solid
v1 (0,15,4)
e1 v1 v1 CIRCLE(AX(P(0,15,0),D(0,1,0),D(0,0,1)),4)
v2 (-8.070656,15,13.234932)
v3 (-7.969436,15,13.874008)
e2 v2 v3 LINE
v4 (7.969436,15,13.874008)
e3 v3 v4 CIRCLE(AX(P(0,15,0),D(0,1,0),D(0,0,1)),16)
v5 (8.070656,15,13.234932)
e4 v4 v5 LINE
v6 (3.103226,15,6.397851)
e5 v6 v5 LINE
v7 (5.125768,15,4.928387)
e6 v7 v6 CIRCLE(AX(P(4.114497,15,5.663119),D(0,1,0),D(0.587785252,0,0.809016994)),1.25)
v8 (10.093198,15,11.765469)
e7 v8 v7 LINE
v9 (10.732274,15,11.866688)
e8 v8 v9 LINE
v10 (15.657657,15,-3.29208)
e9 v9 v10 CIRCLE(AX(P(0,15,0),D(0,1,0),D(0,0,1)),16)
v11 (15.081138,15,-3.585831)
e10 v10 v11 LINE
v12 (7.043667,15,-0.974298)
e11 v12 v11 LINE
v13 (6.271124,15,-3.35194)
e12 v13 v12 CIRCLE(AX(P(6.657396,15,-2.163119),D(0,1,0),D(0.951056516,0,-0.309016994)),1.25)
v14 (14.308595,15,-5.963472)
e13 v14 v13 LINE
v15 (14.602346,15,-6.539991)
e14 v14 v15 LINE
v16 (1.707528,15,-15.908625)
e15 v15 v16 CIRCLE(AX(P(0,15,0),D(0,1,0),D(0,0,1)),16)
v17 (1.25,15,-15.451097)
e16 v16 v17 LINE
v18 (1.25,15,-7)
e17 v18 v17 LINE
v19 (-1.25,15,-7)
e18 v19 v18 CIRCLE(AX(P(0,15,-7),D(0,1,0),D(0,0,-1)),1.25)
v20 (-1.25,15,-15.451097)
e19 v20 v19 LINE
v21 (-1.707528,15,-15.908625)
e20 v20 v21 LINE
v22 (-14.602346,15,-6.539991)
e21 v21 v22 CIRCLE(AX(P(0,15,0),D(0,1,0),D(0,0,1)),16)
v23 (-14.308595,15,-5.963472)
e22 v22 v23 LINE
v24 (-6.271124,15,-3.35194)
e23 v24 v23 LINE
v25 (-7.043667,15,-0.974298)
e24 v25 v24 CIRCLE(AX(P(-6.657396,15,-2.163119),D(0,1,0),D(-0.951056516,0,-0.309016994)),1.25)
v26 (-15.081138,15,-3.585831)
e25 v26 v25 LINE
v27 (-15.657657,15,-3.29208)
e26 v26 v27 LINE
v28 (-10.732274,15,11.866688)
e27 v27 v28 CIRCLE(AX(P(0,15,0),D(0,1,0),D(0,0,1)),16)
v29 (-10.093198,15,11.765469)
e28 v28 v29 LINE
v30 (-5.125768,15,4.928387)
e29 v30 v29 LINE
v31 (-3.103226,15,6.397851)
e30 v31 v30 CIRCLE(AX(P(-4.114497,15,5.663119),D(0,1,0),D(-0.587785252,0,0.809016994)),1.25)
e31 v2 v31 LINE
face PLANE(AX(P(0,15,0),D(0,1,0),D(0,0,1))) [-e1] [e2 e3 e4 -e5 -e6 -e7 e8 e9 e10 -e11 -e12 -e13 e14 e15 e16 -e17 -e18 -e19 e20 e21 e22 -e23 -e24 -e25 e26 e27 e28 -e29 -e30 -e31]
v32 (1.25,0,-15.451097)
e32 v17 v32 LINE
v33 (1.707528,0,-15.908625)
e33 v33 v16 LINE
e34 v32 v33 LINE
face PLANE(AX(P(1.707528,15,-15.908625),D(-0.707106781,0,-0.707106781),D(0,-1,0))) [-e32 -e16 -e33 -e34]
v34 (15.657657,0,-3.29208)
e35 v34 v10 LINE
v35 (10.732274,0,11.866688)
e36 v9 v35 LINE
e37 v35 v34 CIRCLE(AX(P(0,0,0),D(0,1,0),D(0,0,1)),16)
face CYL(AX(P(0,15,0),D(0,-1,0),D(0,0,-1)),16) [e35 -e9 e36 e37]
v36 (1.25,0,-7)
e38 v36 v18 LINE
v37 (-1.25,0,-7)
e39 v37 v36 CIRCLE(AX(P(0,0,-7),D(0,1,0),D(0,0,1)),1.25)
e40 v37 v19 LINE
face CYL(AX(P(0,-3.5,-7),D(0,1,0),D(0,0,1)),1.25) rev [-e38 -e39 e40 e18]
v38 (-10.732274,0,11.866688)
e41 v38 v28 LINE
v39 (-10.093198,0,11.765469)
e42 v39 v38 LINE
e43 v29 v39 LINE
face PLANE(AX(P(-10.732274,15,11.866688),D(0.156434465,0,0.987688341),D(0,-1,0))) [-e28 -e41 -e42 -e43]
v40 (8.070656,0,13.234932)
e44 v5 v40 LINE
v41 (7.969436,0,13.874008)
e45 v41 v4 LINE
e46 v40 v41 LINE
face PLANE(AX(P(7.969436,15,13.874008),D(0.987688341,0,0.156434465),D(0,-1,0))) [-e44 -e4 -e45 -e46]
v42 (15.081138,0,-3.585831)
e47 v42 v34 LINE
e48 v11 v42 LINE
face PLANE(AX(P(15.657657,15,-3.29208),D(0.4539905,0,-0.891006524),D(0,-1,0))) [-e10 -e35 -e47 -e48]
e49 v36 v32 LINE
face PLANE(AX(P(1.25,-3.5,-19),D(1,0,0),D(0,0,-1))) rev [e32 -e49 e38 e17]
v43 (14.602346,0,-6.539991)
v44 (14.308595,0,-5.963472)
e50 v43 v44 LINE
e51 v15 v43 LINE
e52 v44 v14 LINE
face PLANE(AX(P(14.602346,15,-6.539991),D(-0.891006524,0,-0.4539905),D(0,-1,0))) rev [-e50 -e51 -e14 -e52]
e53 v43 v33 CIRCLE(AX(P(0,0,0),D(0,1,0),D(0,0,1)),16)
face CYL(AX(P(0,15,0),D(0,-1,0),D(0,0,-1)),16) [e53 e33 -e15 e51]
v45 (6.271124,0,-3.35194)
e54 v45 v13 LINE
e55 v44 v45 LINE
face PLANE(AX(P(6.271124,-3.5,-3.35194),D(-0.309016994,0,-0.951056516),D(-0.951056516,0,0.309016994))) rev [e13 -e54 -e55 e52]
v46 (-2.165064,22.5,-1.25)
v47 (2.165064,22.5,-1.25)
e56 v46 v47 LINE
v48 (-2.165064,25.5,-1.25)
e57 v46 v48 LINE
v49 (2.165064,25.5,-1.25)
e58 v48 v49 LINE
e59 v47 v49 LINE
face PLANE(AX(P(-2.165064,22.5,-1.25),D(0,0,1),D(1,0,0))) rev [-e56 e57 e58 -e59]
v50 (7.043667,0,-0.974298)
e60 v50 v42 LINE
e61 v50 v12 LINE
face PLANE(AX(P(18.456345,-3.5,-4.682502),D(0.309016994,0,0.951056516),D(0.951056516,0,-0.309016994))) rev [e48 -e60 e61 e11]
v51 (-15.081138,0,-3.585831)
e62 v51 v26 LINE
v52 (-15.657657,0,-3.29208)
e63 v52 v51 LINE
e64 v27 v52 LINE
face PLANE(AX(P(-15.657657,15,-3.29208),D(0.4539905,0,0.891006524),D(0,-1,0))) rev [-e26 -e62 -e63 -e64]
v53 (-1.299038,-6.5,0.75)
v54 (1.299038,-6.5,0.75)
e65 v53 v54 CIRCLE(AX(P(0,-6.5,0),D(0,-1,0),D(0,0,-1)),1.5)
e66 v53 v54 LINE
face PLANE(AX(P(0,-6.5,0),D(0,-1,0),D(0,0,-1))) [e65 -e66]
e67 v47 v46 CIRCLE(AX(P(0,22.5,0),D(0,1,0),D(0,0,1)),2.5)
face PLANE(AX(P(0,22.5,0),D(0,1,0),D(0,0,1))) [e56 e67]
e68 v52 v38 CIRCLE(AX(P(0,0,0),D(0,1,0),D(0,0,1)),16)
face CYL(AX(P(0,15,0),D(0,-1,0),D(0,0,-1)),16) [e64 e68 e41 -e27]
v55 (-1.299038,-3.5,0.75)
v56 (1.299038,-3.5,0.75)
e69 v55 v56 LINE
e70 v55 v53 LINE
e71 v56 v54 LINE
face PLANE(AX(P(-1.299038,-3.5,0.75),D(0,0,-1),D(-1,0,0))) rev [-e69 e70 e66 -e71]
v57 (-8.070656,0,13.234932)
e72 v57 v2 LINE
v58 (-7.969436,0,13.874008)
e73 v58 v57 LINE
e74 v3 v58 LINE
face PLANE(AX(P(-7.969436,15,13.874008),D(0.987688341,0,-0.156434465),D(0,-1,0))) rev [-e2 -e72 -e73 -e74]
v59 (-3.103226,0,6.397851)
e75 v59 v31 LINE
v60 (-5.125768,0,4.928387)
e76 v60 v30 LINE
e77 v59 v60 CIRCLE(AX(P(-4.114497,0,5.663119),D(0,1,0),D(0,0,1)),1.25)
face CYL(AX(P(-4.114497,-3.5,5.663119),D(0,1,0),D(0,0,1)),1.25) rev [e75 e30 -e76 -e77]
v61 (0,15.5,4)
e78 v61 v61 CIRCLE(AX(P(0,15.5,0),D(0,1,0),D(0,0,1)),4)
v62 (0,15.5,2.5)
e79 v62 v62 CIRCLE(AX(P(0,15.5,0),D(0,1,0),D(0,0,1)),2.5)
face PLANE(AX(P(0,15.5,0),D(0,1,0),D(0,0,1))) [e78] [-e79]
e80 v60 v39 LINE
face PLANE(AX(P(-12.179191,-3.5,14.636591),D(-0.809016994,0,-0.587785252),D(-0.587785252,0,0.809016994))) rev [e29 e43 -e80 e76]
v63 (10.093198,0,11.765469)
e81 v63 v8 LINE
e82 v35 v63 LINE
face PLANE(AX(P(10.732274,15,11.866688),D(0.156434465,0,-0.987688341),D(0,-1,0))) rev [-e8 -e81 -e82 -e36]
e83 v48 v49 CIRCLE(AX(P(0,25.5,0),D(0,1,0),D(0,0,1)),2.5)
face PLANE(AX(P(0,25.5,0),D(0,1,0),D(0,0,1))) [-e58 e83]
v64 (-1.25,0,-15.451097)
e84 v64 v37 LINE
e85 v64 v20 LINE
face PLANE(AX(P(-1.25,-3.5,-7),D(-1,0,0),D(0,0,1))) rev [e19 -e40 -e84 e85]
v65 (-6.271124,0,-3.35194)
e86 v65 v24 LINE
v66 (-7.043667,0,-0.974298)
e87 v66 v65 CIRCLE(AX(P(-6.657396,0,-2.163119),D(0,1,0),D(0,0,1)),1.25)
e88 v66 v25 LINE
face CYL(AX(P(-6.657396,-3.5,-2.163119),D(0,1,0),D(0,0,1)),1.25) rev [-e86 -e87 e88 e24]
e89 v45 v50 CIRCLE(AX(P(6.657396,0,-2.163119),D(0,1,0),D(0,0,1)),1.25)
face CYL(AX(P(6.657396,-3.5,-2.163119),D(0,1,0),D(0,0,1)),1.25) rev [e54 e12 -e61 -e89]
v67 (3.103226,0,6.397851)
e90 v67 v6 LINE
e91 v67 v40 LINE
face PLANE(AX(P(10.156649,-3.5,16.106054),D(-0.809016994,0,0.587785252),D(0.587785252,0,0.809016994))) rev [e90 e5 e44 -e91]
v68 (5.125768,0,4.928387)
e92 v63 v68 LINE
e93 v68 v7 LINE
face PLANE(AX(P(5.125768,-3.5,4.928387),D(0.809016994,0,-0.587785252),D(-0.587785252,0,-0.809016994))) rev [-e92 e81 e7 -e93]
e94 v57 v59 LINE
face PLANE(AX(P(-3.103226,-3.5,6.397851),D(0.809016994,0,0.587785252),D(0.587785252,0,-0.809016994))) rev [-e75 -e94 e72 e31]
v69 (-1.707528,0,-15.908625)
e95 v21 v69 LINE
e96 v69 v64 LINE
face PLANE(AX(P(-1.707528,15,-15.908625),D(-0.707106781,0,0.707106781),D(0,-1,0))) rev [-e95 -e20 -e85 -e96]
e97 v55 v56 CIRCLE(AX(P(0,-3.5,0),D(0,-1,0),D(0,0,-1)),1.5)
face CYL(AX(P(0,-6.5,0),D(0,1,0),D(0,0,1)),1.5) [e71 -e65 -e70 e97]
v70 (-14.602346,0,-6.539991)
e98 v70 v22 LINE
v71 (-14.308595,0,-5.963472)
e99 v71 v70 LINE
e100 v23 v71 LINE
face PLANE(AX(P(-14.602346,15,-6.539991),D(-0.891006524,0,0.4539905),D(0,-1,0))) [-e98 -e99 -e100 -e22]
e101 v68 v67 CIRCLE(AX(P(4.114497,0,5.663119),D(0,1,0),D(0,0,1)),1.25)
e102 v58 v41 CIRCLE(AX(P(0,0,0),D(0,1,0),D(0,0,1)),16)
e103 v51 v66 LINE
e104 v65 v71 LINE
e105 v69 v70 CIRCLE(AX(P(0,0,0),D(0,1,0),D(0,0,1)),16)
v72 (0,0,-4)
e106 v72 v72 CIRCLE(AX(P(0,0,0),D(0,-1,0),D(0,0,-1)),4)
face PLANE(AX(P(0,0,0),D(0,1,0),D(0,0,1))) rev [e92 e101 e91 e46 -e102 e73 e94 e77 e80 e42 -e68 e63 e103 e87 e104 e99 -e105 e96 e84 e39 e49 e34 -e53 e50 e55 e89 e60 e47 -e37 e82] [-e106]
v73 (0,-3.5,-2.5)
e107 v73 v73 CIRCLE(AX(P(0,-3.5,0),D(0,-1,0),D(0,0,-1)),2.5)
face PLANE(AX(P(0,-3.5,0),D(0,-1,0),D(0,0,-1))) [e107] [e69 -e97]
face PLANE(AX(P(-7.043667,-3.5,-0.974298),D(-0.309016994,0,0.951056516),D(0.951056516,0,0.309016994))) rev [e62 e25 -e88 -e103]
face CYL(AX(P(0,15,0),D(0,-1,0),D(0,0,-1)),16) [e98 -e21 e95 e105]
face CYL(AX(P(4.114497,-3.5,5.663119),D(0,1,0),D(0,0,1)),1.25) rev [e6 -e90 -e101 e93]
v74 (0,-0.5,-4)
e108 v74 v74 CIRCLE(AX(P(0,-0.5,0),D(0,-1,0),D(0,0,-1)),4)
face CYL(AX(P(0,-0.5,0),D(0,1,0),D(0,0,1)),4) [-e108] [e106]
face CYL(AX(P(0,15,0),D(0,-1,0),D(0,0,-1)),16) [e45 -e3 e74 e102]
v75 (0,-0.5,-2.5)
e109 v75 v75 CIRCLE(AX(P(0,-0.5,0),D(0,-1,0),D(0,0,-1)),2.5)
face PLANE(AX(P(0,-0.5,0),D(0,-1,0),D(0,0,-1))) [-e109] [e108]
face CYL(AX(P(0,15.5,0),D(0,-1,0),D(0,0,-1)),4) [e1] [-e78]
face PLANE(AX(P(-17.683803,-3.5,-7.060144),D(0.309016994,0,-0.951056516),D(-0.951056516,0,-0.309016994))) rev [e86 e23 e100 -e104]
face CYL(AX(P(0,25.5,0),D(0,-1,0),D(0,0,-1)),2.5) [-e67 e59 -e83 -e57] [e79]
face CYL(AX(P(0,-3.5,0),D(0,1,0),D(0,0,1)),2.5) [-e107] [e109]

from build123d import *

# Parameters (mm, degrees)
SKETCH_1_R               = 16
EXTRUDE_1_DEPTH          = 15
SKETCH_2_R               = 4
EXTRUDE_2_DEPTH          = 0.5
EXTRUDE_START            = 0.5
SKETCH_3_R               = 4
EXTRUDE_3_DEPTH          = 0.5
SKETCH_4_R               = 2.5
EXTRUDE_4_DEPTH          = 10
EXTRUDE_START_2          = 3
SKETCH_5_R               = 2.5
EXTRUDE_5_DEPTH          = 3
CUT_EXTRUDE_START        = -3
CUT_EXTRUDE_1_DEPTH      = 3
CUT_EXTRUDE_2_DEPTH      = 30.227555491
PATTERN_CIRCULAR_1_COUNT = 5
SKETCH_8_R               = 1.5
EXTRUDE_6_DEPTH          = 3
CHAMFER_1_SIZE           = 0.5
CUT_EXTRUDE_3_DEPTH      = 3


with BuildPart() as part:
    # 草图1 → 凸台-拉伸1 (new body)
    with BuildSketch(Plane(origin=(0, 0, 0), x_dir=(1, 0, 0), z_dir=(0, 1, 0))):
        with Locations(Location((0, 0, 0), (0, 0, 270))):
            Circle(SKETCH_1_R)
    extrude(amount=EXTRUDE_1_DEPTH)

    # 草图2 → 凸台-拉伸2 (add)
    with BuildSketch(Plane(origin=(0, 15, 0), x_dir=(1, 0, 0), z_dir=(0, 1, 0))):
        with Locations(Location((0, 0, 0), (0, 0, 270))):
            Circle(SKETCH_2_R)
    extrude(amount=EXTRUDE_2_DEPTH)

    # 草图3 → 凸台-拉伸3 (add)
    with BuildSketch(Plane.XZ.offset(EXTRUDE_START)):
        with Locations(Location((0, 0, 0), (0, 0, 90))):
            Circle(SKETCH_3_R)
    extrude(amount=-EXTRUDE_3_DEPTH)

    # 草图4 → 凸台-拉伸4 (add)
    with BuildSketch(Plane(origin=(0, 15.5, 0), x_dir=(1, 0, 0), z_dir=(0, 1, 0))):
        with Locations(Location((0, 0, 0), (0, 0, 270))):
            Circle(SKETCH_4_R)
    extrude(amount=EXTRUDE_4_DEPTH)

    # 草图5 → 凸台-拉伸5 (add)
    with BuildSketch(Plane.XZ.offset(0.5).offset(EXTRUDE_START_2)):
        with Locations(Location((0, 0, 0), (0, 0, 90))):
            Circle(SKETCH_5_R)
    extrude(amount=-EXTRUDE_5_DEPTH)

    # 草图6 → 切除-拉伸1 (cut)
    with BuildSketch(Plane(origin=(0, 25.5, 0), x_dir=(1, 0, 0), z_dir=(0, 1, 0)).offset(CUT_EXTRUDE_START)):
        with BuildLine():
            Line((-2.165063509, 1.25), (2.165063509, 1.25))
            ThreePointArc((2.165063509, 1.25), (0, 2.5), (-2.165063509, 1.25))
        make_face()
    extrude(amount=CUT_EXTRUDE_1_DEPTH, mode=Mode.SUBTRACT)

    # 草图7 → 切除-拉伸2 (cut, through all)
    with BuildSketch(Plane(origin=(0, 15, 0), x_dir=(1, 0, 0), z_dir=(0, 1, 0))):
        with BuildLine():
            Line((-1.25, 7), (-1.25, 19))
            Line((-1.25, 19), (1.25, 19))
            Line((1.25, 19), (1.25, 7))
            ThreePointArc((1.25, 7), (0, 5.75), (-1.25, 7))
        make_face()
    cut_extrude_2 = extrude(amount=-CUT_EXTRUDE_2_DEPTH, mode=Mode.SUBTRACT)

    # 阵列(圆周)1: 切除-拉伸2 ×5 about axis
    pattern_circular_1_axis = Axis((0, 0, 0), (0, 1, 0))
    for i in range(1, PATTERN_CIRCULAR_1_COUNT):
        add(cut_extrude_2.rotate(pattern_circular_1_axis, i * 360 / PATTERN_CIRCULAR_1_COUNT), mode=Mode.SUBTRACT)

    # 草图8 → 凸台-拉伸6 (add)
    with BuildSketch(Plane.XZ.offset(3.5)):
        with Locations(Location((0, 0, 0), (0, 0, 270))):
            Circle(SKETCH_8_R)
    extrude(amount=EXTRUDE_6_DEPTH)

    # 倒角1
    # the kernel refuses this chamfer: 0.5, 0.465086612 mm, written as the material it takes off along each edge
    with BuildSketch(Plane(origin=(-1.25, 16.285841494, -15.951097141), x_dir=(-0.9957189737161891, 0, 0.0924322745667282), z_dir=(0, -1, 0)), Plane(origin=(14.784123635, 16.285841494, -6.117980741), x_dir=(-0.3956024015425532, 0, -0.9184218746816544), z_dir=(0, -1, 0)), Plane(origin=(10.3870909, 16.285841494, 12.169977101), x_dir=(0.7512232435318049, 0, -0.6600482091313895), z_dir=(0, -1, 0)), Plane(origin=(-8.364548414, 16.285841494, 13.639440231), x_dir=(0.8598838991841529, 0, 0.5104896472249537), z_dir=(0, -1, 0)), Plane(origin=(-15.556666121, 16.285841494, -3.74033945), x_dir=(-0.21978576745721443, 0, 0.9755481620213546), z_dir=(0, -1, 0))) as chamfer_1_piece_1:
        with BuildLine():
            Line((0.459494947, 0), (CHAMFER_1_SIZE * 0.0924322745667, -CHAMFER_1_SIZE * 0.995718973716))
            Line((CHAMFER_1_SIZE * 0.0924322745667, -CHAMFER_1_SIZE * 0.995718973716), (0, 0))
            ThreePointArc((0, 0), (0.236132262, 0.001648308), (0.459494947, 0))
        make_face()
    extrude(amount=17.571682988, mode=Mode.SUBTRACT)
    with BuildSketch(Plane(origin=(1.25, 16.285841494, -15.951097141), x_dir=(0, 0, 1), z_dir=(0, -1, 0)), Plane(origin=(15.556666121, 16.285841494, -3.74033945), x_dir=(-0.9510565162951534, 0, 0.3090169943749483), z_dir=(0, -1, 0)), Plane(origin=(8.364548414, 16.285841494, 13.639440231), x_dir=(-0.587785252292472, 0, -0.8090169943749483), z_dir=(0, -1, 0)), Plane(origin=(-14.784123635, 16.285841494, -6.117980741), x_dir=(0.9510565162951535, 0, 0.3090169943749477), z_dir=(0, -1, 0))) as chamfer_1_piece_2:
        with BuildLine():
            Line((CHAMFER_1_SIZE, 0), (0.042472163, -0.457527837))
            ThreePointArc((0.042472163, -0.457527837), (0.020184991, -0.235273731), (0, 0))
            Line((0, 0), (CHAMFER_1_SIZE, 0))
        make_face()
    extrude(amount=17.571682988, mode=Mode.SUBTRACT)
    with BuildSketch(Plane(origin=(-10.3870909, 16.285841494, 12.169977101), x_dir=(-0.7512232435318061, 0, -0.6600482091313881), z_dir=(0, -1, 0))) as chamfer_1_piece_3:
        with BuildLine():
            Line((0.459494947, 0), (CHAMFER_1_SIZE * 0.0924322745667, CHAMFER_1_SIZE * 0.995718973716))
            Line((CHAMFER_1_SIZE * 0.0924322745667, CHAMFER_1_SIZE * 0.995718973716), (0, 0))
            ThreePointArc((0, 0), (0.236132262, -0.001648308), (0.459494947, 0))
        make_face()
    extrude(amount=17.571682988, mode=Mode.SUBTRACT)

    # 草图9 → 切除-拉伸3 (cut)
    with BuildSketch(Plane.XZ.offset(6.5).offset(CUT_EXTRUDE_START)):
        with BuildLine():
            Line((-1.299038106, 0.75), (1.299038106, 0.75))
            ThreePointArc((1.299038106, 0.75), (0, 1.5), (-1.299038106, 0.75))
        make_face()
    extrude(amount=CUT_EXTRUDE_3_DEPTH, mode=Mode.SUBTRACT)


solid = part.part
